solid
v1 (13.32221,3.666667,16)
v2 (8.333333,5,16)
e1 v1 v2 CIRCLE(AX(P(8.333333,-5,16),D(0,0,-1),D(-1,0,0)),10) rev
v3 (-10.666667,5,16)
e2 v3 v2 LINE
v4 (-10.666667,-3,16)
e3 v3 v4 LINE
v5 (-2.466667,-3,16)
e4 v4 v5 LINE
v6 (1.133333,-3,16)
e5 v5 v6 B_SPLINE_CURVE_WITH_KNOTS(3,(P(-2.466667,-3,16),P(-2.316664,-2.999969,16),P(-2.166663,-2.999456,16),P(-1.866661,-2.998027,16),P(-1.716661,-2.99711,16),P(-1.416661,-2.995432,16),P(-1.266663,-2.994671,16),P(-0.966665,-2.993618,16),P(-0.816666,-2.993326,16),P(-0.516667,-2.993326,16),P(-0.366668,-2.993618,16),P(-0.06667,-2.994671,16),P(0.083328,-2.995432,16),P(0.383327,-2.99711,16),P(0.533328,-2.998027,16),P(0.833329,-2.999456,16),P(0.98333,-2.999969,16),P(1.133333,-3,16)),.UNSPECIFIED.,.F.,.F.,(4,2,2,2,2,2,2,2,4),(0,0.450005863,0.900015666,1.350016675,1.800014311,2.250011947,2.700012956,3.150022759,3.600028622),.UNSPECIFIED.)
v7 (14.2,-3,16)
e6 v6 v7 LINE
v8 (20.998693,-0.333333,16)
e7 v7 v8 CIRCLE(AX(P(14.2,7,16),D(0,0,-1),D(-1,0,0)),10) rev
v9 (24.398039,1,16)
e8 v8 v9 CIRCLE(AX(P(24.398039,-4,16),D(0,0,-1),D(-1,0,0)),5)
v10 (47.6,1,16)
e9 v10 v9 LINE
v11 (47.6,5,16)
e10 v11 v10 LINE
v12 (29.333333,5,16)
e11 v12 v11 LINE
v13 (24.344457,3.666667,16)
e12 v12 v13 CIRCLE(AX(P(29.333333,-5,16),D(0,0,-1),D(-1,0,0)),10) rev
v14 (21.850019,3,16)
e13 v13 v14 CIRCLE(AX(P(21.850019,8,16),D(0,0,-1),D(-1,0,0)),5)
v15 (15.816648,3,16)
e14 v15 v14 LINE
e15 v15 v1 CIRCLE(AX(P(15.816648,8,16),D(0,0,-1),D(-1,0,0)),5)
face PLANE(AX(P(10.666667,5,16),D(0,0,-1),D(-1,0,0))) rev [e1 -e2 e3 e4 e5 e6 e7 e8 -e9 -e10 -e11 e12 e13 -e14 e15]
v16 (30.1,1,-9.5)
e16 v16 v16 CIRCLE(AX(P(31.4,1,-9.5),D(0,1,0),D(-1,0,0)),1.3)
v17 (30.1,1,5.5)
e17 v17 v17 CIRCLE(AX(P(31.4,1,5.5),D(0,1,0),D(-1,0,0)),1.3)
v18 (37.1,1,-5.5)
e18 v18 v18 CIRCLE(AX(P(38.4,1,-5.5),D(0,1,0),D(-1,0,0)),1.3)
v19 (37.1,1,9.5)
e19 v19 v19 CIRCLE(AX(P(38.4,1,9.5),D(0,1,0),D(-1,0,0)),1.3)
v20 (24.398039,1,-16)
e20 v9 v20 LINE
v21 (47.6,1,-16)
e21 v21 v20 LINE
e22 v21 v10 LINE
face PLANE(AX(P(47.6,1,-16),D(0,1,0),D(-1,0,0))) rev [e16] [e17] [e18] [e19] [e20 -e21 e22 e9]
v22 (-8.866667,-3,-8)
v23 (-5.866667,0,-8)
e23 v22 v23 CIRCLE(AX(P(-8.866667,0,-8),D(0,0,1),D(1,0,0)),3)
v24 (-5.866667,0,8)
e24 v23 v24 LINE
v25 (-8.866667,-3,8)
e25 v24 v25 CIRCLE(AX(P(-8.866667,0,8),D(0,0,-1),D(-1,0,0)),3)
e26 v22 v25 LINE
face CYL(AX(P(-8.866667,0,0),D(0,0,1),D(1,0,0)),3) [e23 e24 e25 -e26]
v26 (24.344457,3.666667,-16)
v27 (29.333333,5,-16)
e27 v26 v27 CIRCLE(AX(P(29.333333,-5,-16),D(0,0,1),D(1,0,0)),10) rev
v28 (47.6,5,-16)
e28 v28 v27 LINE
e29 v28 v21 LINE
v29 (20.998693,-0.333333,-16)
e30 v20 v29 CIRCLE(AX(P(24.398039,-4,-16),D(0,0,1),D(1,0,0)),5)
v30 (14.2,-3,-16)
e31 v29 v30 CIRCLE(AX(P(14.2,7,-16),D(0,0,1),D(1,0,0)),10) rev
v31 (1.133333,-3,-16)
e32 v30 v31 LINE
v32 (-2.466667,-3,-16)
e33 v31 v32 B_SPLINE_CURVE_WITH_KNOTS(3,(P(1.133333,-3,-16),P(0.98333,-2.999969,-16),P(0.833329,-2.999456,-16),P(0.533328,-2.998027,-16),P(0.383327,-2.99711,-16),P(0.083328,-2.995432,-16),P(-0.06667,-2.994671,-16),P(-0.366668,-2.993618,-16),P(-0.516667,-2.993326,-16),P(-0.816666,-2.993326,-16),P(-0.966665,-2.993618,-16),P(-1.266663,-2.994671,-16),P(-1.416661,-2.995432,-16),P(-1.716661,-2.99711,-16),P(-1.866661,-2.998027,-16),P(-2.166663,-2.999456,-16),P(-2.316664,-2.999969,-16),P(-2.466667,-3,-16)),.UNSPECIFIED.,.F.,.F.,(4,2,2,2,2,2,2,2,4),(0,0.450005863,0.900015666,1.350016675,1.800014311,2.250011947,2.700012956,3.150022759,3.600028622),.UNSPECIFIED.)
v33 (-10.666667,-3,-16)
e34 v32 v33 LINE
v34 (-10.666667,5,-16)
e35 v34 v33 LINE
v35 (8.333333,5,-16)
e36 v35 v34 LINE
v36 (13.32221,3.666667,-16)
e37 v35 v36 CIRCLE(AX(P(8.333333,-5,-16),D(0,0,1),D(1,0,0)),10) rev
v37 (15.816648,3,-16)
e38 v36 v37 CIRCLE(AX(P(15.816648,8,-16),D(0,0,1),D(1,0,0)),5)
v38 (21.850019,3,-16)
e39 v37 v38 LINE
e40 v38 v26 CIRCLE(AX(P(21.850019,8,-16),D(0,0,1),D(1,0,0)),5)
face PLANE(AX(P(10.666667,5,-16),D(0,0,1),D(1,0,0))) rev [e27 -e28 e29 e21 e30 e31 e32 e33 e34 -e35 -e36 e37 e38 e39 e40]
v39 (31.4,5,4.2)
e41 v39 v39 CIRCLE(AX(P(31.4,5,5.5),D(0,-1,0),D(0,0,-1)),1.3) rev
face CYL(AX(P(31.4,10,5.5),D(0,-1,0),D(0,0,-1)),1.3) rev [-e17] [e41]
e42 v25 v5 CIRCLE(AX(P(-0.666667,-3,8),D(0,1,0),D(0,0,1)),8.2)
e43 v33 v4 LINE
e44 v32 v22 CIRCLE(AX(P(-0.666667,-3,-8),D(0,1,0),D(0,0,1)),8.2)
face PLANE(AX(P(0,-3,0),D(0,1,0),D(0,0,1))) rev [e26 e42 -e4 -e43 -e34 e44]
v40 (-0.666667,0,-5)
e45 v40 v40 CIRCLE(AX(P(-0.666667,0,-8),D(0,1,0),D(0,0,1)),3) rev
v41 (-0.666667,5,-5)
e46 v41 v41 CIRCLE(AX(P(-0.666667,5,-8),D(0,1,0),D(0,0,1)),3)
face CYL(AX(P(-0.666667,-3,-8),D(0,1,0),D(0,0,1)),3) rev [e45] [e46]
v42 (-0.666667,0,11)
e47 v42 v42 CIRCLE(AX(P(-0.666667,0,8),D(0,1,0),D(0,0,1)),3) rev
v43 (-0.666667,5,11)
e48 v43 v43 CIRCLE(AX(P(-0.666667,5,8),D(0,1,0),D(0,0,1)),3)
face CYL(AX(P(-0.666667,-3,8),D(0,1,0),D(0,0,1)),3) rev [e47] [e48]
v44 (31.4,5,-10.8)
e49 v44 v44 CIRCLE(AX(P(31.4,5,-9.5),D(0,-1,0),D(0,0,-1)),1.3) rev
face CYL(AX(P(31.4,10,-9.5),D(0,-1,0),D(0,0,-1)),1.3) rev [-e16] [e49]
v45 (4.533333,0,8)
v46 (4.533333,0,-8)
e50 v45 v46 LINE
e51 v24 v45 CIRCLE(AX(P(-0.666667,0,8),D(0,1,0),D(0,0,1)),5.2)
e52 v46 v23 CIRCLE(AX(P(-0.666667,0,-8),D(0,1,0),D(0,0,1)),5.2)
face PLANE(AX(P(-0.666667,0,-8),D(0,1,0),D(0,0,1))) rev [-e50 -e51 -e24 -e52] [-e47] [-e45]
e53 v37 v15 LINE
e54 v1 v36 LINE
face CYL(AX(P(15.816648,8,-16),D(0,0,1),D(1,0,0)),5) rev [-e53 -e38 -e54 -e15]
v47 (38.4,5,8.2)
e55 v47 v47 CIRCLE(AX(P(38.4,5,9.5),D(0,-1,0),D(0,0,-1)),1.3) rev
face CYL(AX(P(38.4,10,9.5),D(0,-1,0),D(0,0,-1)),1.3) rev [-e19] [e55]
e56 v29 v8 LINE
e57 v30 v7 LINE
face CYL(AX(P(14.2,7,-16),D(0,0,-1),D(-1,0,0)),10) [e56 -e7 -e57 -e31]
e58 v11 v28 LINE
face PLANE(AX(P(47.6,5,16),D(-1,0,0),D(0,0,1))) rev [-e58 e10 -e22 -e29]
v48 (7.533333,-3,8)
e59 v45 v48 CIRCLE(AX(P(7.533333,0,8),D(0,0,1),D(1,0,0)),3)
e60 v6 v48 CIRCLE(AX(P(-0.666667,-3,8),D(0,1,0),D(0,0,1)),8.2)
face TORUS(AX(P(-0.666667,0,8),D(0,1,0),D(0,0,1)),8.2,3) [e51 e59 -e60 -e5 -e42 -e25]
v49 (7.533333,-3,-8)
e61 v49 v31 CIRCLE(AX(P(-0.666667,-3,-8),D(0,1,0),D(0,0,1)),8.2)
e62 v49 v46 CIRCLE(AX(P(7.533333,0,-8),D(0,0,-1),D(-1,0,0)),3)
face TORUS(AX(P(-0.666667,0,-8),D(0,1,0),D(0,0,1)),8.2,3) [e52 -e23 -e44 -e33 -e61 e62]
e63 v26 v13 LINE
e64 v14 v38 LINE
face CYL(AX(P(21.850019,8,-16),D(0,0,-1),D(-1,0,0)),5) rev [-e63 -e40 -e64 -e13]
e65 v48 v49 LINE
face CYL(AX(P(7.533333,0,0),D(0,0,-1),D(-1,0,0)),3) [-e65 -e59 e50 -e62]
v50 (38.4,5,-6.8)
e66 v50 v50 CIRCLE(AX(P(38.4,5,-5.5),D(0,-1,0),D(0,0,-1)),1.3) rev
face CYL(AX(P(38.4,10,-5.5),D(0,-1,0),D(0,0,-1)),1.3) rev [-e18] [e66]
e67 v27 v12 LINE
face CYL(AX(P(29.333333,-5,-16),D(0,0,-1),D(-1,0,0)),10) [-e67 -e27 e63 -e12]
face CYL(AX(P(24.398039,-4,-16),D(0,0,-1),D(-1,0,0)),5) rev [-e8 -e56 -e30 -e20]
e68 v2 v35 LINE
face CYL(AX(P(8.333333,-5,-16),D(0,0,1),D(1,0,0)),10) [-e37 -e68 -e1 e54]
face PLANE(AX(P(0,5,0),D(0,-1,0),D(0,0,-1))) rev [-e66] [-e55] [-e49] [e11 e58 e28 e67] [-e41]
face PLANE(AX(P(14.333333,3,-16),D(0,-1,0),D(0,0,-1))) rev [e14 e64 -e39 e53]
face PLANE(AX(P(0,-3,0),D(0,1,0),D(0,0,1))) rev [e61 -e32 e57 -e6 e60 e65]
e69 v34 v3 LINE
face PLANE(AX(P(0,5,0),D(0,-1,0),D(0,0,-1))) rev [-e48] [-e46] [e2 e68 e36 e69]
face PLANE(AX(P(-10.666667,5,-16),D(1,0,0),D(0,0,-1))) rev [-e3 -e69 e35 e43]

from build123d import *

# Parameters (mm, degrees)
SKETCH1_W               = 21.333333334
SKETCH1_H               = 32
BOSS_EXTRUDE1_DEPTH     = 5
SKETCH2_W               = 37.6
SKETCH2_H               = 32
BOSS_EXTRUDE2_DEPTH     = 5
SKETCH7_R               = 1.3
CUT_EXTRUDE2_DEPTH      = 10
CUT_EXTRUDE3_DEPTH      = 51.465433715
CUT_EXTRUDE3_DEPTH_BACK = 51.465433715
SKETCH8_W               = 25.4
SKETCH8_H               = 1
SKETCH8_W_2             = 9
SKETCH8_H_2             = 2
SKETCH9_W               = 32.866666667
SKETCH9_H               = 32
BOSS_EXTRUDE3_DEPTH     = 3
CUT_EXTRUDE4_DEPTH      = 51.465433715
CUT_EXTRUDE4_DEPTH_BACK = 51.465433715
SKETCH10_R              = 3
CUT_EXTRUDE5_DEPTH      = 8
FILLET8_R               = 3
FILLET9_R               = 10
FILLET10_R              = 5


with BuildPart() as part:
    # Sketch1 → Boss-Extrude1 (new body)
    with BuildSketch(Plane(origin=(0, 0, 0), x_dir=(1, 0, 0), z_dir=(0, 1, 0))):
        Rectangle(SKETCH1_W, SKETCH1_H)
    extrude(amount=BOSS_EXTRUDE1_DEPTH)

    # Sketch2 → Boss-Extrude2 (add)
    with BuildSketch(Plane(origin=(0, 0, 0), x_dir=(1, 0, 0), z_dir=(0, 1, 0))):
        with Locations((28.8, 0)):
            Rectangle(SKETCH2_W, SKETCH2_H)
    extrude(amount=BOSS_EXTRUDE2_DEPTH)

    # Sketch7 → Cut-Extrude2 (cut)
    with BuildSketch(Plane(origin=(0, 0, 0), x_dir=(1, 0, 0), z_dir=(0, 1, 0))):
        with Locations(Location((38.4, -9.5, 0), (0, 0, 90))):
            Circle(SKETCH7_R)
        with Locations(Location((31.4, -5.5, 0), (0, 0, 90))):
            Circle(SKETCH7_R)
        with Locations(Location((38.4, 5.5, 0), (0, 0, 90))):
            Circle(SKETCH7_R)
        with Locations(Location((31.4, 9.5, 0), (0, 0, 90))):
            Circle(SKETCH7_R)
    extrude(amount=CUT_EXTRUDE2_DEPTH, mode=Mode.SUBTRACT)

    # Sketch8 → Cut-Extrude3 (cut, two sides: drawn at the far end of the back side and taken through both)
    with BuildSketch(Plane.XY.offset(-CUT_EXTRUDE3_DEPTH_BACK)):
        with Locations((34.9, 0.5)):
            Rectangle(SKETCH8_W, SKETCH8_H)
        with Locations((18.833333333, 4)):
            Rectangle(SKETCH8_W_2, SKETCH8_H_2)
    extrude(amount=CUT_EXTRUDE3_DEPTH + CUT_EXTRUDE3_DEPTH_BACK, mode=Mode.SUBTRACT)

    # Sketch9 → Boss-Extrude3 (add)
    with BuildSketch(Plane(origin=(0, 0, 0), x_dir=(1, 0, 0), z_dir=(0, 1, 0))):
        with Locations((5.766666667, 0)):
            Rectangle(SKETCH9_W, SKETCH9_H)
    extrude(amount=-BOSS_EXTRUDE3_DEPTH)

    # Sketch10 → Cut-Extrude4 (cut, two sides: drawn at the far end of the back side and taken through both)
    with BuildSketch(Plane(origin=(0, 0, 0), x_dir=(1, 0, 0), z_dir=(0, 1, 0)).offset(-CUT_EXTRUDE4_DEPTH_BACK)):
        with Locations(Location((-0.666666667, 8, 0), (0, 0, 270))):
            Circle(SKETCH10_R)
        with Locations(Location((-0.666666667, -8, 0), (0, 0, 270))):
            Circle(SKETCH10_R)
    extrude(amount=CUT_EXTRUDE4_DEPTH + CUT_EXTRUDE4_DEPTH_BACK, mode=Mode.SUBTRACT)

    # Sketch11 → Cut-Extrude5 (cut)
    with BuildSketch(Plane(origin=(0, 0, 0), x_dir=(1, 0, 0), z_dir=(0, 1, 0))):
        with BuildLine():
            Line((-5.866666667, 8), (-5.866666667, -8))
            ThreePointArc((-5.866666667, -8), (-0.666666667, -13.2), (4.533333333, -8))
            Line((4.533333333, -8), (4.533333333, 8))
            ThreePointArc((4.533333333, 8), (-0.666666667, 13.2), (-5.866666667, 8))
        make_face()
    extrude(amount=-CUT_EXTRUDE5_DEPTH, mode=Mode.SUBTRACT)

    # Fillet8
    # the kernel refuses this fillet: 3 mm, written as the material it takes off along each edge
    with BuildSketch(Plane(origin=(-0.666666667, -3, -8), x_dir=(1, 0, 0), z_dir=(0, 0, 1))) as fillet8_piece_1:
        with BuildLine():
            CenterArc((5.2 + FILLET8_R, FILLET8_R), FILLET8_R, 180, 90)
            Line((5.2, FILLET8_R), (5.2, 0))
            Line((5.2, 0), (5.2 + FILLET8_R, 0))
        make_face()
    revolve(axis=Axis((-0.666666667, -3, -8), (0, 1, 0)), revolution_arc=180, mode=Mode.SUBTRACT)
    with BuildSketch(Plane(origin=(-0.666666667, -3, 8), x_dir=(-1, 0, 0), z_dir=(0, 0, -1))) as fillet8_piece_2:
        with BuildLine():
            CenterArc((5.2 + FILLET8_R, FILLET8_R), FILLET8_R, 180, 90)
            Line((5.2, FILLET8_R), (5.2, 0))
            Line((5.2, 0), (5.2 + FILLET8_R, 0))
        make_face()
    revolve(axis=Axis((-0.666666667, -3, 8), (0, 1, 0)), revolution_arc=180, mode=Mode.SUBTRACT)
    with BuildSketch(Plane(origin=(-5.866666667, -3, 8), x_dir=(-1, 0, 0), z_dir=(0, 0, -1)), Plane(origin=(4.533333333, -3, -8), x_dir=(1, 0, 0), z_dir=(0, 0, 1))) as fillet8_piece_3:
        with BuildLine():
            CenterArc((FILLET8_R, FILLET8_R), FILLET8_R, 180, 90)
            Line((0, FILLET8_R), (0, 0))
            Line((0, 0), (FILLET8_R, 0))
        make_face()
    extrude(amount=16, mode=Mode.SUBTRACT)

    # Fillet9
    # the kernel refuses this fillet: 10 mm, written as the material it takes off along each edge
    with BuildSketch(Plane(origin=(23.333333333, 5, 31), x_dir=(0, -1, 0), z_dir=(0, 0, -1))) as fillet9_piece_1:
        with BuildLine():
            CenterArc((10, -6), FILLET9_R, 143.130102354, 36.869897646)
            Line((0, -6), (-0.2, -6))
            Line((-0.2, -6), (-0.2, 0))
            Line((-0.2, 0), (0, 0.2))
            ThreePointArc((0, 0.2), (1, 0.2), (1.84, 0.12))
            Line((1.84, 0.12), (2, 0))
        make_face()
    extrude(amount=62, mode=Mode.SUBTRACT)
    with BuildSketch(Plane(origin=(14.333333333, 5, -31), x_dir=(-1, 0, 0), z_dir=(0, 0, 1))) as fillet9_piece_2:
        with BuildLine():
            CenterArc((6, 10), FILLET9_R, 233.130102354, 36.869897646)
            Line((0, 2), (-0.12, 1.84))
            ThreePointArc((-0.12, 1.84), (-0.2, 1), (-0.2, 0))
            Line((-0.2, 0), (0, -0.2))
            Line((0, -0.2), (6, -0.2))
            Line((6, -0.2), (6, 0))
        make_face()
    extrude(amount=62, mode=Mode.SUBTRACT)
    with BuildSketch(Plane(origin=(22.2, -3, -36), x_dir=(0, 1, 0), z_dir=(0, 0, 1))) as fillet9_piece_3:
        with BuildLine():
            CenterArc((10, 8), FILLET9_R, 180, 53.130102354)
            Line((0, 8), (-0.2, 8))
            Line((-0.2, 8), (-0.2, 0))
            Line((-0.2, 0), (0, -0.2))
            ThreePointArc((0, -0.2), (2, -0.2), (3.88, -0.16))
            Line((3.88, -0.16), (4, 0))
        make_face()
    extrude(amount=72, mode=Mode.SUBTRACT)

    # Fillet10
    fillet10_edges = [part.edges().sort_by_distance(p)[0] for p in [
        (22.2, 1, 0),
        (14.333333333, 3, 0),
        (23.333333333, 3, 0),
    ]]
    fillet(fillet10_edges, radius=FILLET10_R)


solid = part.part
